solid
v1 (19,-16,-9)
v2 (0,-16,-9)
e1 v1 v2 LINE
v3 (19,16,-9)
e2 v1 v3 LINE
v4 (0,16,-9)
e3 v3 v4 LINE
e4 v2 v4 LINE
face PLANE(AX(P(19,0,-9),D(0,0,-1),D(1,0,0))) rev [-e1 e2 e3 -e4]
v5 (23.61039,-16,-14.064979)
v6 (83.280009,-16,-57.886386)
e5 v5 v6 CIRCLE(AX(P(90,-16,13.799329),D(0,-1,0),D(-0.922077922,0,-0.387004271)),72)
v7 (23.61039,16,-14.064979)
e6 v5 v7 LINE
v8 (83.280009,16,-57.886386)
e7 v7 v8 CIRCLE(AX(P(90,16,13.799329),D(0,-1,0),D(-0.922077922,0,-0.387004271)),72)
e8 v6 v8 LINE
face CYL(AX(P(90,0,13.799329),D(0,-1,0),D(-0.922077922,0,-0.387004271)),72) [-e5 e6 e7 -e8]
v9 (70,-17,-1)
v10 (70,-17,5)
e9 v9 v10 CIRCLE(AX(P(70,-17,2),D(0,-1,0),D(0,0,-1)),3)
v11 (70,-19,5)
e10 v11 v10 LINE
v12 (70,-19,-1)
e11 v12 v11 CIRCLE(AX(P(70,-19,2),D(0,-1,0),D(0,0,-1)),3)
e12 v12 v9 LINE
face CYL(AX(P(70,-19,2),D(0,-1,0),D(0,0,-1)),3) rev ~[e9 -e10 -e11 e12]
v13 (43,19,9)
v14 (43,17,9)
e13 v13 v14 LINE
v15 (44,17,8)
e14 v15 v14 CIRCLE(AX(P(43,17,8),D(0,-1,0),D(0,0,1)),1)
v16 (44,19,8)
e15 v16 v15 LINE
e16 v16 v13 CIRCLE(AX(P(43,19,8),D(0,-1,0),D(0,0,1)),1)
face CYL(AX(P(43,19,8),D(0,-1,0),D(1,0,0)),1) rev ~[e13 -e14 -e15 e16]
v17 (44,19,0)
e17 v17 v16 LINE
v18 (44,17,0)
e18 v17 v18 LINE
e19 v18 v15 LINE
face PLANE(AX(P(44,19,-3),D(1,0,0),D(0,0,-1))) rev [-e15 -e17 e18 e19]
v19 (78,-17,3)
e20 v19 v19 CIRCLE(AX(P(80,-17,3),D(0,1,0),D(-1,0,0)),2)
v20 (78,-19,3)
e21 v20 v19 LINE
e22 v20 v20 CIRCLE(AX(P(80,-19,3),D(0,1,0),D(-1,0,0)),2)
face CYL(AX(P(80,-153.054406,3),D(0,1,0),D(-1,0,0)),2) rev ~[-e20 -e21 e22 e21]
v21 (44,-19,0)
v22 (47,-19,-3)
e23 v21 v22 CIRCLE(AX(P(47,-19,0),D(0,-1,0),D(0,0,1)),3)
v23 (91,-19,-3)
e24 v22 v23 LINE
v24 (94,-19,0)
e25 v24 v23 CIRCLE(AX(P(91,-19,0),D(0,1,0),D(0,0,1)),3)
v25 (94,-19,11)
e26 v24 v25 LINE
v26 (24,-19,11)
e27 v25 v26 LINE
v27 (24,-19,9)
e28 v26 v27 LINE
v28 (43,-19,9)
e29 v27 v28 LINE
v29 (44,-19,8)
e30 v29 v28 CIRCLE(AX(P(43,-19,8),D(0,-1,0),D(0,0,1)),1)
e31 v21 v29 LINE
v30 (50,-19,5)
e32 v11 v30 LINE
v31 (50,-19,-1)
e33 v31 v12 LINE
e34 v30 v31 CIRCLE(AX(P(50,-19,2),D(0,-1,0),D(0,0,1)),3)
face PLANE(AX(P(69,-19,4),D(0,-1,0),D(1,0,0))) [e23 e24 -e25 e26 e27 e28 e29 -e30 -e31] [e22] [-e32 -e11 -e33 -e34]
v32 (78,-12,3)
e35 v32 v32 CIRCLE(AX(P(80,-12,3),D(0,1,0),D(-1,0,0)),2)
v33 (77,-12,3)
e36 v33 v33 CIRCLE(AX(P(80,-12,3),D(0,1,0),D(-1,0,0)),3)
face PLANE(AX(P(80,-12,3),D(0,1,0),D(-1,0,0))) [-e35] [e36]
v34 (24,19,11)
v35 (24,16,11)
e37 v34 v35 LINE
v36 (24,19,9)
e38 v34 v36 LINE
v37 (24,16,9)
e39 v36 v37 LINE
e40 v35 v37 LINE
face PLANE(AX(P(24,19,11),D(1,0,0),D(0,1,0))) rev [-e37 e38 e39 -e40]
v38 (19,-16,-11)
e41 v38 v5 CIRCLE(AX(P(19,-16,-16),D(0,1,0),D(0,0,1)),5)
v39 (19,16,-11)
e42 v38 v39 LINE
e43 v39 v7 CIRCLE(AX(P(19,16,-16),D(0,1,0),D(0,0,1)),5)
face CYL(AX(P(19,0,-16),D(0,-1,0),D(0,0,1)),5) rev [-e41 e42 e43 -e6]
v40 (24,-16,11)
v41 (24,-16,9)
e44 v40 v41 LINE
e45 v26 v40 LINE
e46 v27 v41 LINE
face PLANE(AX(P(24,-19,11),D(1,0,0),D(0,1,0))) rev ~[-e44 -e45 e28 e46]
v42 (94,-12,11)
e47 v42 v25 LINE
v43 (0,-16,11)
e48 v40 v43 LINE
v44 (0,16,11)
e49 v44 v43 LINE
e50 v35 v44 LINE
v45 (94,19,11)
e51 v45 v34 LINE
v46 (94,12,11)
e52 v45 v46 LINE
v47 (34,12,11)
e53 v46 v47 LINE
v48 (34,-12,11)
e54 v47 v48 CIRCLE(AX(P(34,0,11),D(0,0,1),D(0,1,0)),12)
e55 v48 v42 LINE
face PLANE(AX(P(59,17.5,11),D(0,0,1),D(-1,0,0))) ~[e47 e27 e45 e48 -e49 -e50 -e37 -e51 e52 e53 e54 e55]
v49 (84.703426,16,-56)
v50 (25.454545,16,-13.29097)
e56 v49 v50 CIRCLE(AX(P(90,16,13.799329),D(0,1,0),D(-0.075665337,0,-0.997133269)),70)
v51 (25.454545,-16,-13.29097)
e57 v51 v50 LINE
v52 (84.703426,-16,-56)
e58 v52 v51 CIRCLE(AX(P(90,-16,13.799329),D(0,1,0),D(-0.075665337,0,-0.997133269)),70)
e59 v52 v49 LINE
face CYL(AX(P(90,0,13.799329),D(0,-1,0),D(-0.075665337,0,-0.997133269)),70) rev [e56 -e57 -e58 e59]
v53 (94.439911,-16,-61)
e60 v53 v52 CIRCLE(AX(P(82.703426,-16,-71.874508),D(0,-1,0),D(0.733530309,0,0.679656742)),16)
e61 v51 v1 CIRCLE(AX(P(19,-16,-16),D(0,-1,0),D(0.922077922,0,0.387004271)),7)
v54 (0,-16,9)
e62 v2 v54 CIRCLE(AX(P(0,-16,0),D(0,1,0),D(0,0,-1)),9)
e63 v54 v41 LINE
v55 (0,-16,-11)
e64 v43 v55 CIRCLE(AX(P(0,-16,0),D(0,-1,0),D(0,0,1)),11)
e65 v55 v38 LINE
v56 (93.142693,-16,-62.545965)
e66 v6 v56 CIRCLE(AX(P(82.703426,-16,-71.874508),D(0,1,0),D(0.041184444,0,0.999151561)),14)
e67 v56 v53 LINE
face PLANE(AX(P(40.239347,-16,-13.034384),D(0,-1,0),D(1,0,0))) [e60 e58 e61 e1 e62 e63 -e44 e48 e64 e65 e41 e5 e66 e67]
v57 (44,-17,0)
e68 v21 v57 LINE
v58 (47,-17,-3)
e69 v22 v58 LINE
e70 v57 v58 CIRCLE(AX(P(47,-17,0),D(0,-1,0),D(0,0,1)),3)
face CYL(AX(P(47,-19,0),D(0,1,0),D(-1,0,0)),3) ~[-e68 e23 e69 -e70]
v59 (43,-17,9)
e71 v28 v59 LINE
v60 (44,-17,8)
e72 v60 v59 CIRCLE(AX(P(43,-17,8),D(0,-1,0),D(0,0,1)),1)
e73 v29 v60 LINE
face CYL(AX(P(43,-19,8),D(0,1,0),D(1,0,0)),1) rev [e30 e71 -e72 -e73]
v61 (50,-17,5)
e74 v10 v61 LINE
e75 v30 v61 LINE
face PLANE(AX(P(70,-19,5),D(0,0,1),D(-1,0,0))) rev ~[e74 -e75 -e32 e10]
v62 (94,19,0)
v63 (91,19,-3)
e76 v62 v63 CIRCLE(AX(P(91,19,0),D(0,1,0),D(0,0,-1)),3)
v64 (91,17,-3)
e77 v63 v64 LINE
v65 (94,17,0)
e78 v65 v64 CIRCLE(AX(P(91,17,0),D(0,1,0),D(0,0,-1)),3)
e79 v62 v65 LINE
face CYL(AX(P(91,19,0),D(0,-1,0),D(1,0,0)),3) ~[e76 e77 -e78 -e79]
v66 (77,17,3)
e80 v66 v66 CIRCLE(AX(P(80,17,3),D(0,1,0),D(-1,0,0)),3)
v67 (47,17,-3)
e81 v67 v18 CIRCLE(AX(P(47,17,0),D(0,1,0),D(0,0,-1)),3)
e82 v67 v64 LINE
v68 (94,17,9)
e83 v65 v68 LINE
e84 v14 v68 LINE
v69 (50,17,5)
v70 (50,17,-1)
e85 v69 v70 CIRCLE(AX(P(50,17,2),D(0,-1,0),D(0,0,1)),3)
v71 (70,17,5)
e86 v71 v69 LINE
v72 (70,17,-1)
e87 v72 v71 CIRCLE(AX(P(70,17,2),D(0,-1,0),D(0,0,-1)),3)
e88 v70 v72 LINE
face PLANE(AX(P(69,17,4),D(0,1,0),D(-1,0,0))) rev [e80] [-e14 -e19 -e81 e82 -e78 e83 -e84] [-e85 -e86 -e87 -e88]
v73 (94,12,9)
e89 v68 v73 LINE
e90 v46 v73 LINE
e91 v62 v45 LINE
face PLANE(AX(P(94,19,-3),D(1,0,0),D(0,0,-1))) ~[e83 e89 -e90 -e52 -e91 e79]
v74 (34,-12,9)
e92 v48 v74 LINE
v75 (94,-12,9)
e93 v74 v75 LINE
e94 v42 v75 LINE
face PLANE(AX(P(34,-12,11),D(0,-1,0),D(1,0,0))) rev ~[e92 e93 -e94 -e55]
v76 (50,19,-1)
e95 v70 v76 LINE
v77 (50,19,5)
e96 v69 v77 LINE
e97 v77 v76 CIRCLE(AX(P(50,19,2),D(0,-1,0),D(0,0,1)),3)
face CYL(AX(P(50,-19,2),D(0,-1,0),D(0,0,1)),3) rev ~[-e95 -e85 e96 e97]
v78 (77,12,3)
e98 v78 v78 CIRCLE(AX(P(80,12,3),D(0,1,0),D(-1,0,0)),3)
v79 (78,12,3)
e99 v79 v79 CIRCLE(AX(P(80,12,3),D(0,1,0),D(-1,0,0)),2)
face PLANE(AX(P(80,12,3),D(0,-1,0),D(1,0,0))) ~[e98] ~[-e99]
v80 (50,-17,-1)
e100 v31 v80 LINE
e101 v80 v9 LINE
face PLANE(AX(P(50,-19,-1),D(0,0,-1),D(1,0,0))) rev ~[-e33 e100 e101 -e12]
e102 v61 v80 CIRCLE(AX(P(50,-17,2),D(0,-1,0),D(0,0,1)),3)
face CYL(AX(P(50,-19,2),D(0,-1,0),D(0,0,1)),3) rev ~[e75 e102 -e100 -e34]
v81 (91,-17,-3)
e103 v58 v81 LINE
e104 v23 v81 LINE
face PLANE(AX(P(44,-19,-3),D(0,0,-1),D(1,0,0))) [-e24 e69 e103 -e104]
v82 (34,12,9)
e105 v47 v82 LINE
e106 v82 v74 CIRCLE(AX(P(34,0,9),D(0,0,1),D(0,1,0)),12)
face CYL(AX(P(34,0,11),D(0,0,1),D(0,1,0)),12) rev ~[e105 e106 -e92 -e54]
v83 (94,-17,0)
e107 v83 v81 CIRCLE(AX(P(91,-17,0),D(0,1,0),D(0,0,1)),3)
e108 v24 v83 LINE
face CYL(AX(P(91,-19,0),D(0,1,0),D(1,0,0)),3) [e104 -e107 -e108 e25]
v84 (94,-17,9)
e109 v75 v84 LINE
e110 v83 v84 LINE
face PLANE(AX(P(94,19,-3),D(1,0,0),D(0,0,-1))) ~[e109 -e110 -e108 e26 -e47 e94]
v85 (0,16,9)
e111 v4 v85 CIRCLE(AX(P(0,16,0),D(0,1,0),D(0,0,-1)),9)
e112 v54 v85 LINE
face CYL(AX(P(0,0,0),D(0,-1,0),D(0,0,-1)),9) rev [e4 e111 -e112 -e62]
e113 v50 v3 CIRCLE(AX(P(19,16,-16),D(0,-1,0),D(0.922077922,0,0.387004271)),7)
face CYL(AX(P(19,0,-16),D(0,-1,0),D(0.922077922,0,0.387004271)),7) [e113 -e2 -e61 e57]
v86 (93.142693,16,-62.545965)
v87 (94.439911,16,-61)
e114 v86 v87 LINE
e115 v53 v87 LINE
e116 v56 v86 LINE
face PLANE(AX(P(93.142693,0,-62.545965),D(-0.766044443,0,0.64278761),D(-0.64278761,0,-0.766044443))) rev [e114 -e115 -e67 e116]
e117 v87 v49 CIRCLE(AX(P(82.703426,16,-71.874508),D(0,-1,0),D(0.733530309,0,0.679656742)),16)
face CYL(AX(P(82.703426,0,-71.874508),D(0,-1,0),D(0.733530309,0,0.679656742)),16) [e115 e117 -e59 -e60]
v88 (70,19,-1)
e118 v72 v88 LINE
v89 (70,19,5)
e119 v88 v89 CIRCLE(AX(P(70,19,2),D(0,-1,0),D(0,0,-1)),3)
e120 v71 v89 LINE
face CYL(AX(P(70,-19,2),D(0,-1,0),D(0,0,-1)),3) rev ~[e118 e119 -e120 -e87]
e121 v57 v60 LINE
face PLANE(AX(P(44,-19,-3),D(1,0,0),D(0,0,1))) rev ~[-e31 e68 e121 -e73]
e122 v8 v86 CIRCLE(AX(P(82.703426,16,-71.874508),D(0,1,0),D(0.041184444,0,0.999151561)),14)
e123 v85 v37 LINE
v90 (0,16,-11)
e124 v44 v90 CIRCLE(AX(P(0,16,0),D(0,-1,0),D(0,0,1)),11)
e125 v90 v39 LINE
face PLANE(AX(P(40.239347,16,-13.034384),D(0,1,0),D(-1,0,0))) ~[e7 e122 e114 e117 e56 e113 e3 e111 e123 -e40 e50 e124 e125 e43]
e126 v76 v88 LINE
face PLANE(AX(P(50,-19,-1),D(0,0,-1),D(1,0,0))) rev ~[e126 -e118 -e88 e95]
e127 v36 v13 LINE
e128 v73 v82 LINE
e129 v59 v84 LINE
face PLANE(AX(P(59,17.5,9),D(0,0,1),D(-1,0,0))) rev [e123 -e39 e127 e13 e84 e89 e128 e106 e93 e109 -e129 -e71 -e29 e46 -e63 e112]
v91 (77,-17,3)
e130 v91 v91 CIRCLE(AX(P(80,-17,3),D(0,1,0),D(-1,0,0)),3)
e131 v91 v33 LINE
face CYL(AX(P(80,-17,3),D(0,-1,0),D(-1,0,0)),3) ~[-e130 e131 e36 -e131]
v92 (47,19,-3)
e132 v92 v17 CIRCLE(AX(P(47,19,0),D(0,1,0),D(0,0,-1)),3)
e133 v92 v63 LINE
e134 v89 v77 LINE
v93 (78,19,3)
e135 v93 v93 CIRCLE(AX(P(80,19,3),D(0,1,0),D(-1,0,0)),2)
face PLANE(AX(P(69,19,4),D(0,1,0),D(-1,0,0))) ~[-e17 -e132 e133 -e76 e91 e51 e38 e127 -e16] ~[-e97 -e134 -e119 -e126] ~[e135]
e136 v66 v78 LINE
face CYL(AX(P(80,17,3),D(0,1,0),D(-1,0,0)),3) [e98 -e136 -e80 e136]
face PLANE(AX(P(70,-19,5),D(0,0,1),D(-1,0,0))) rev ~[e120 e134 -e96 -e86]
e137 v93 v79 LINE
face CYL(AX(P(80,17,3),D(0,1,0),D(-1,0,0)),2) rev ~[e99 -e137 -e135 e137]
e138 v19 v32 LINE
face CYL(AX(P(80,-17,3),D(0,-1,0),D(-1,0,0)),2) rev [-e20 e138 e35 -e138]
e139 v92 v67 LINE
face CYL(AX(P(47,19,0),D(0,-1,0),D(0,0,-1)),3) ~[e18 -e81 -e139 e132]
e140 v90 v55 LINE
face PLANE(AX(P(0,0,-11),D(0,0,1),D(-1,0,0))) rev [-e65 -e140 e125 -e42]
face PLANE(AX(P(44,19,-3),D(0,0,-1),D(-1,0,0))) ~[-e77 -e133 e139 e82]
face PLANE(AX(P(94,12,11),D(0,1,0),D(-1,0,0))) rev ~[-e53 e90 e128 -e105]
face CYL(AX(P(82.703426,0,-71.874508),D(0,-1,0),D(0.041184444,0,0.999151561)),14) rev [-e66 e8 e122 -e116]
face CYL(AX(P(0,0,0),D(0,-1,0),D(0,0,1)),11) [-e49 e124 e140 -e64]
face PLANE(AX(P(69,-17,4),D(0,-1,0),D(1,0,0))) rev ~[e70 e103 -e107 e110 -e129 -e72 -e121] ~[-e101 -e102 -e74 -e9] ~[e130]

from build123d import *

# Parameters (mm, degrees)
F1_DEPTH  = 16
F2_W      = 70
F2_H      = 3
F3_DEPTH  = 2
F4_W      = 50
F4_H      = 14
F5_DEPTH  = 2
F6_R      = 1
F9_DEPTH  = 2
F11_DEPTH = 38.001
F13_D     = 4
F14_R     = 3
F14_R_2   = 2
F15_DEPTH = 5
F16_R     = 3


# Not quite as in the source:
# - a pattern or mirror of a feature is missing from the dataset's text; its kind, count and spacing are read off the source's solid


with BuildPart() as f1:
    # F0 (on Front) → F1 (new body)
    with BuildSketch(Plane.XZ):
        with BuildLine():
            Line((94, 11), (0, 11))
            ThreePointArc((0, 11), (-11, 0), (0, -11))
            Line((0, -11), (19, -11))
            ThreePointArc((19, -11), (21.7681124643, -11.8361612201), (23.6103896104, -14.064978646))
            ThreePointArc((23.6103896104, -14.064978646), (47.381548553, -44.2322797447), (83.2800086179, -57.8863860143))
            ThreePointArc((83.2800086179, -57.8863860143), (88.6838234672, -59.2161173312), (93.142692854, -62.5459647892))
            Line((93.142692854, -62.5459647892), (94.4399113384, -61))
            ThreePointArc((94.4399113384, -61), (90.012513527, -57.6415445278), (84.7034264019, -56))
            ThreePointArc((84.7034264019, -56), (49.0672193413, -42.9854179344), (25.4545454545, -13.2909701044))
            ThreePointArc((25.4545454545, -13.2909701044), (22.87535745, -10.1706257081), (19, -9))
            Line((19, -9), (0, -9))
            ThreePointArc((0, -9), (-9, 0), (0, 9))
            Line((0, 9), (94, 9))
            Line((94, 9), (94, 11))
        make_face()
    extrude(amount=F1_DEPTH)

    # F2 (on face) → F3 (join)
    with BuildSketch(Plane.XY.offset(11)):
        with Locations((59, -17.5)):
            Rectangle(F2_W, F2_H)
    extrude(amount=-F3_DEPTH)

    # F4 (on face) → F5 (join)
    with BuildSketch(Plane.XZ.offset(19)):
        with Locations((69, 4)):
            Rectangle(F4_W, F4_H)
    extrude(amount=-F5_DEPTH)

    # F6
    f6_edges = [f1.edges().sort_by_distance(p)[0] for p in [
        (44, -18, 9),
    ]]
    fillet(f6_edges, radius=F6_R)

    # F7: F1 across plane


with BuildPart() as f1_1:
    add(f1.part)
    add(f1.part.mirror(Plane.XZ))

    # F8 (on face) → F9 (cut)
    with BuildSketch(Plane.XY.offset(11)):
        with BuildLine():
            Line((94, 12), (34, 12))
            ThreePointArc((34, 12), (22, 0), (34, -12))
            Line((34, -12), (94, -12))
            Line((94, -12), (94, 12))
        make_face()
    extrude(amount=-F9_DEPTH, mode=Mode.SUBTRACT)

    # F10 (on face) → F11 (cut, through all)
    with BuildSketch(Plane.XZ.offset(19)):
        with BuildLine():
            ThreePointArc((50, 5), (47, 2), (50, -1))
            Line((50, -1), (70, -1))
            ThreePointArc((70, -1), (73, 2), (70, 5))
            Line((70, 5), (50, 5))
        make_face()
    extrude(amount=-F11_DEPTH, mode=Mode.SUBTRACT)

    # F13 (through all)
    with Locations(Plane.XZ.offset(19)):
        with Locations((80, 3)):
            Hole(F13_D / 2)

    # F14 (on face) → F15 (join)
    with BuildSketch(Plane(origin=(0, -17, 0), x_dir=(-1, 0, 0), z_dir=(0, 1, 0))):
        with Locations((-80, 3)):
            Circle(F14_R)
        with Locations((-80, 3)):
            Circle(F14_R_2, mode=Mode.SUBTRACT)
    f15 = extrude(amount=F15_DEPTH)

    # F15_copies: F15 across plane
    add(f15.mirror(Plane.ZX))

    # F16
    f16_edges = [f1_1.edges().sort_by_distance(p)[0] for p in [
        (94, -18, -3),
        (44, -18, -3),
        (94, 18, -3),
        (44, 18, -3),
    ]]
    fillet(f16_edges, radius=F16_R)


solid = f1_1.part
